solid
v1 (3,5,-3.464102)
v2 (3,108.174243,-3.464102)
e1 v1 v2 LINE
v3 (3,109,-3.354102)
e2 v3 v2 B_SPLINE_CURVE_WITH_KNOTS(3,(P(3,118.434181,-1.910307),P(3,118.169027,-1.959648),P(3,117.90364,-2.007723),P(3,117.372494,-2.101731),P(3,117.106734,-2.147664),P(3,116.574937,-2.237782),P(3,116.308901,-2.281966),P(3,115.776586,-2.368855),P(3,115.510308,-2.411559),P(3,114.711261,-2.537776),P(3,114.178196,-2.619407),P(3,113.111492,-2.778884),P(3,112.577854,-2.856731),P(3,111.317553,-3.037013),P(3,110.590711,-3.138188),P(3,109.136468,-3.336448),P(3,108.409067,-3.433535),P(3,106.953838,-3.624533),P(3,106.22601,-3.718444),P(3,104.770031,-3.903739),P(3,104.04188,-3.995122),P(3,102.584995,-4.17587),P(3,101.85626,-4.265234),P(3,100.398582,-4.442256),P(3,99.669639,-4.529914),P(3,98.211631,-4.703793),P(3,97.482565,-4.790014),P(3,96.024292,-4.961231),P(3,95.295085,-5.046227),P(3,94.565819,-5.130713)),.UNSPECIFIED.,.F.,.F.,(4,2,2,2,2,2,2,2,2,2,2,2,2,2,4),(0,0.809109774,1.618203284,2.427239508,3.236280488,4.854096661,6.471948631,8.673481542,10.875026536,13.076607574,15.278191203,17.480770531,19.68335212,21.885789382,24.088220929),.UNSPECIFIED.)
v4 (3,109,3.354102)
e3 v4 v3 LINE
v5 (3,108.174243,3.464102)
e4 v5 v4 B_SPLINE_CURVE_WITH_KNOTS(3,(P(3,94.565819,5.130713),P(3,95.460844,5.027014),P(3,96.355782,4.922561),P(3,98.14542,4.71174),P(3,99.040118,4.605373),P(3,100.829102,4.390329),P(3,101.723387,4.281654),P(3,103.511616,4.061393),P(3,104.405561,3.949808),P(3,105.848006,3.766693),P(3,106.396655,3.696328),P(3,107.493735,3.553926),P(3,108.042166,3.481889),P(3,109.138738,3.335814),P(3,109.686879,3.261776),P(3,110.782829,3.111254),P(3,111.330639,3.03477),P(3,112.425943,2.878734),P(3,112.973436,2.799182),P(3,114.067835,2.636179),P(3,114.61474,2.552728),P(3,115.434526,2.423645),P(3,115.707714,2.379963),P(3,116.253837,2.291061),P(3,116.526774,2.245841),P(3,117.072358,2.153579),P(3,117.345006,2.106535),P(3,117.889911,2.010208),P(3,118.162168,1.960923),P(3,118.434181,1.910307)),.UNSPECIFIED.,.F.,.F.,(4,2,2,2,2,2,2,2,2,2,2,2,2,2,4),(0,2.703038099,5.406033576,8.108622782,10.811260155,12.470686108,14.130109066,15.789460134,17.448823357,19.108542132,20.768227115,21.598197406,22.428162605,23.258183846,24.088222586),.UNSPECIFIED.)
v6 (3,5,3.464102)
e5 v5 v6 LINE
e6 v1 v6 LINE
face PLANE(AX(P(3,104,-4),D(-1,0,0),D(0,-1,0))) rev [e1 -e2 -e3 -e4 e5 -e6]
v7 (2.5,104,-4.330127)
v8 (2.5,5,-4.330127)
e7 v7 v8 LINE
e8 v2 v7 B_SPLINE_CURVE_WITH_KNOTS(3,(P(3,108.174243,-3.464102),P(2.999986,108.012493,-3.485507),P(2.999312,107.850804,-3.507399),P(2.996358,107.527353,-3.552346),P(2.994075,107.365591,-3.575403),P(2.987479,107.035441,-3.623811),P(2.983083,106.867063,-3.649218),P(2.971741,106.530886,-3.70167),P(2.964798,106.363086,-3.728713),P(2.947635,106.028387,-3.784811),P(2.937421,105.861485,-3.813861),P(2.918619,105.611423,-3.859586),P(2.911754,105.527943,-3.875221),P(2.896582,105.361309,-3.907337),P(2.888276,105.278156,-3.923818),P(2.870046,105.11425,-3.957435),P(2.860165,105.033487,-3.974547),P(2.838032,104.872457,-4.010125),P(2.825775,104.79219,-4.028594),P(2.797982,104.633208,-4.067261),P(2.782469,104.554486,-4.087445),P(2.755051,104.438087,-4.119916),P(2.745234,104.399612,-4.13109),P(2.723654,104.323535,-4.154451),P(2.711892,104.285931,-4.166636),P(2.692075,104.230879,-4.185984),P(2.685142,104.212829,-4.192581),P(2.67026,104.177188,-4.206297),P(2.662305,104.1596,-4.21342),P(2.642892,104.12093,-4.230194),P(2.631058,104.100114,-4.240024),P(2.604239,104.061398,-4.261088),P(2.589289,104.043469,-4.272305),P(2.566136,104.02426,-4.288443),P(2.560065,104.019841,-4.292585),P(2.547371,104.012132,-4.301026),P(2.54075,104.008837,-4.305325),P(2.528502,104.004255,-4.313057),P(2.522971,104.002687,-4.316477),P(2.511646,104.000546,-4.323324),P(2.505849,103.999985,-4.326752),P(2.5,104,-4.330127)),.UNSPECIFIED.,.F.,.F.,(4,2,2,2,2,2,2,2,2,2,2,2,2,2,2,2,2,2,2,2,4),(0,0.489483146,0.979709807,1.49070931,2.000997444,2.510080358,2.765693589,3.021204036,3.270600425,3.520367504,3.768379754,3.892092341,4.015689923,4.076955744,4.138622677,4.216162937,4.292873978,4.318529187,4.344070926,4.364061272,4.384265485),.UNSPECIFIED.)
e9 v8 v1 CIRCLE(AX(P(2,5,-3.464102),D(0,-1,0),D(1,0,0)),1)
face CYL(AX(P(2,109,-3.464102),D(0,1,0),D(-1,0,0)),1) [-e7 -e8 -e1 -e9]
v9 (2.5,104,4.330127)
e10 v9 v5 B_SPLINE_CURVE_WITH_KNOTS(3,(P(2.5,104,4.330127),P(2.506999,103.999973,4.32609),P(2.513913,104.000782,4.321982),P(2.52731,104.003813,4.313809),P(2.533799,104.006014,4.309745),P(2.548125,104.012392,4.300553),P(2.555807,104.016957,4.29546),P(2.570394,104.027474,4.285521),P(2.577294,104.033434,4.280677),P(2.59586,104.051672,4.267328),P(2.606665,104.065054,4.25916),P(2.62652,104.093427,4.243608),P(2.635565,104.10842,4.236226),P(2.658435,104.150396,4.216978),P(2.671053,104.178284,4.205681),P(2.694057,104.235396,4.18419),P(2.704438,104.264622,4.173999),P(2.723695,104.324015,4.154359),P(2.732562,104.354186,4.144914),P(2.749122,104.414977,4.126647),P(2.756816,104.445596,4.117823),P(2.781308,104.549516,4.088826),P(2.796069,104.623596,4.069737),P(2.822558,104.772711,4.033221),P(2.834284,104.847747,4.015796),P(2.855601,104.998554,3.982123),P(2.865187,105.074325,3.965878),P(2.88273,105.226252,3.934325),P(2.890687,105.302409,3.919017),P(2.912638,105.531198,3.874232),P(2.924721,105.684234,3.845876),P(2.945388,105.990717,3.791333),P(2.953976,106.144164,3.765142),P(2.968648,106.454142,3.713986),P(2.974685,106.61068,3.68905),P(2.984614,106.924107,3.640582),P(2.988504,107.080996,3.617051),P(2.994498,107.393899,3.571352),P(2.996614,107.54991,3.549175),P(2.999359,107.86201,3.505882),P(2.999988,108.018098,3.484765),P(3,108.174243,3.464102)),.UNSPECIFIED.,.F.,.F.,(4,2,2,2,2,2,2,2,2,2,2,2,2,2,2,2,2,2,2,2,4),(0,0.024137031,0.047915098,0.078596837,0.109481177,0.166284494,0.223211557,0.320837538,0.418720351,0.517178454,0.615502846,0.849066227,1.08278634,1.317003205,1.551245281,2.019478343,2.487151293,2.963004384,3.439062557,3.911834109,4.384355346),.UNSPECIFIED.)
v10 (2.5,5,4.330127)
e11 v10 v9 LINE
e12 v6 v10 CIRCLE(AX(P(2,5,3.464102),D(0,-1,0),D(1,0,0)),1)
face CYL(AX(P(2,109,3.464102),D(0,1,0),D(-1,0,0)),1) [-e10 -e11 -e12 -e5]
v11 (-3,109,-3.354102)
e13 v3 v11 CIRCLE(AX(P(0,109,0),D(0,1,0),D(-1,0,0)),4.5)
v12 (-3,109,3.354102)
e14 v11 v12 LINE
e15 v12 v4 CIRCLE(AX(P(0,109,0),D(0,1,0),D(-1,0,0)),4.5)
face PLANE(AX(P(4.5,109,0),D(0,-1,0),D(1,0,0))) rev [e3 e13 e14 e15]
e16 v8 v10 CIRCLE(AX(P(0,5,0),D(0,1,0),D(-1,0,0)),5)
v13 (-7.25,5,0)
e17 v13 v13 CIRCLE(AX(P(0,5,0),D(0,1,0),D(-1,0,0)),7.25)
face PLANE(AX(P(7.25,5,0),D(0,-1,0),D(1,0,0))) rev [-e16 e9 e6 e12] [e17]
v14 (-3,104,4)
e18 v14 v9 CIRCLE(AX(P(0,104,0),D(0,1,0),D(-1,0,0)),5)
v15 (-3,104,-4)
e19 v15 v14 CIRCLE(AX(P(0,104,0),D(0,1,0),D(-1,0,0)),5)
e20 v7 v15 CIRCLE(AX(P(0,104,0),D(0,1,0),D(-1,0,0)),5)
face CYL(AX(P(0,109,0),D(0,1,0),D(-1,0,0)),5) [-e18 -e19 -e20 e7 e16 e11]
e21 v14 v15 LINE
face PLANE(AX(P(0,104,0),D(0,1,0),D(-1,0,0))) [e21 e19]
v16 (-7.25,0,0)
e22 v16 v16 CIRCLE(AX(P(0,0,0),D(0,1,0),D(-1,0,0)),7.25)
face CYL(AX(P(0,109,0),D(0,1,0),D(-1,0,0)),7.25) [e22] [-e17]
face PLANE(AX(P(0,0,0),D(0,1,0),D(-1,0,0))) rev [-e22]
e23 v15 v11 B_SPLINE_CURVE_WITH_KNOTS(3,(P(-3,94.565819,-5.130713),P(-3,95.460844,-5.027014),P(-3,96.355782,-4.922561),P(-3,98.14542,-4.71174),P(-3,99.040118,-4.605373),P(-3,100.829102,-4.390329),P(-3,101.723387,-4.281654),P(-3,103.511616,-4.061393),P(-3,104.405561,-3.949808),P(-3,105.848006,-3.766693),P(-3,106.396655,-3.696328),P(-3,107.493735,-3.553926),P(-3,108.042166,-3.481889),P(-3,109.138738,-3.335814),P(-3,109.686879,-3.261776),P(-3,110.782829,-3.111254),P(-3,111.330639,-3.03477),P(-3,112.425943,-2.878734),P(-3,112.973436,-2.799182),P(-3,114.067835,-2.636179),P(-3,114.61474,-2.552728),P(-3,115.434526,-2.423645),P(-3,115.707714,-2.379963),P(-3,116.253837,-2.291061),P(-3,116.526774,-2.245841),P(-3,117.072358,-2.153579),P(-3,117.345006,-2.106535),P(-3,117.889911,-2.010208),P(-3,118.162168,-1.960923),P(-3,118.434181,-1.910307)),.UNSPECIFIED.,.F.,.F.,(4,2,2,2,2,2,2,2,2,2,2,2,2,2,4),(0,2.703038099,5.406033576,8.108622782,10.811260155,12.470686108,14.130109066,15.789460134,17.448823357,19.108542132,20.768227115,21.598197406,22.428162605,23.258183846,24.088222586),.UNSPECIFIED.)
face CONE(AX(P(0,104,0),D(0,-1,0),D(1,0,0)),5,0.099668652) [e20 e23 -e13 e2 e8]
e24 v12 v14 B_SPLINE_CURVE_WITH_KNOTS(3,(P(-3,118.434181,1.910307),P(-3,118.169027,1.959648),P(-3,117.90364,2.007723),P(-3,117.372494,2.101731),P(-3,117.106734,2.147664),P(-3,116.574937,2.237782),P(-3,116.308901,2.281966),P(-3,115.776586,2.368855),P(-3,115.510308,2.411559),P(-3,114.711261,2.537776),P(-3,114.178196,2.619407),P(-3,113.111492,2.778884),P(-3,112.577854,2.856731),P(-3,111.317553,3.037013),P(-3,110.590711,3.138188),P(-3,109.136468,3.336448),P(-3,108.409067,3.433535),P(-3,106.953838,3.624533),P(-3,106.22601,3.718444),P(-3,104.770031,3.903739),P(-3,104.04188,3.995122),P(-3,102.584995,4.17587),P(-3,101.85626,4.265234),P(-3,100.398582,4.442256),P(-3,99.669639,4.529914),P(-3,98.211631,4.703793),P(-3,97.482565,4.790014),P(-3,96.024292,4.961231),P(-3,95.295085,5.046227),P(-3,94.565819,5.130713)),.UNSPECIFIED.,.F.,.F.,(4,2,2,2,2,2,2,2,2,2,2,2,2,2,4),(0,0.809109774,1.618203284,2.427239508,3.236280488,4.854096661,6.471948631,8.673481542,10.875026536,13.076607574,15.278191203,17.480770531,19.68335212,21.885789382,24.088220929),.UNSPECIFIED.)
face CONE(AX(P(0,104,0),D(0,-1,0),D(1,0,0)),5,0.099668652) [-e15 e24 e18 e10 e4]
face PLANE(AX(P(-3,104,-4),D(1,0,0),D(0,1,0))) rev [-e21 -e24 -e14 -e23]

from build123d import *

# Parameters (mm, degrees)
CUT_EXTRUDE1_DEPTH = 5
CUT_EXTRUDE2_DEPTH = 99
FILLET1_R          = 1


with BuildPart() as part:
    # Sketch5 → Revolve1 (revolve)
    with BuildSketch(Plane.XY, mode=Mode.PRIVATE) as revolve1_sk:
        Polygon((0, 0), (7.25, 0), (7.25, 5), (5, 5), (5, 104), (4.5, 109), (0, 109), align=None)
    revolve(revolve1_sk.sketch.rotate(Axis((0, 109, 0), (0, -1, 0)), 180), axis=Axis((0, 109, 0), (0, -1, 0)))

    # Sketch6 → Cut-Extrude1 (cut)
    with BuildSketch(Plane(origin=(0, 109, 0), x_dir=(1, 0, 0), z_dir=(0, 1, 0))):
        with BuildLine():
            Line((3, 4), (3, -4))
            ThreePointArc((3, -4), (5, 0), (3, 4))
        make_face()
        with BuildLine():
            Line((-3, 4), (-3, -4))
            ThreePointArc((-3, -4), (-5, 0), (-3, 4))
        make_face()
    extrude(amount=-CUT_EXTRUDE1_DEPTH, mode=Mode.SUBTRACT)

    # Sketch7 → Cut-Extrude2 (cut)
    with BuildSketch(Plane(origin=(0, 104, 0), x_dir=(1, 0, 0), z_dir=(0, 1, 0))):
        with BuildLine():
            Line((3, -4), (3, 4))
            ThreePointArc((3, 4), (5, 0), (3, -4))
        make_face()
    extrude(amount=-CUT_EXTRUDE2_DEPTH, mode=Mode.SUBTRACT)

    # Fillet1
    # the kernel refuses this fillet: 1 mm, written as the material it takes off along each edge
    with BuildSketch(Plane(origin=(3, 108.493644566, 4), x_dir=(0, 0, -1), z_dir=(0, -1, 0))) as fillet1_piece_1:
        with BuildLine():
            CenterArc((0.535898385, -1), FILLET1_R, 90, 60)
            ThreePointArc((-0.330127019, -0.5), (-0.172559651, -0.245050643), (0, 0))
            Line((0, 0), (0.535898385, 0))
        make_face()
    extrude(amount=103.493644566, mode=Mode.SUBTRACT)
    with BuildSketch(Plane(origin=(3, 108.493644566, -4), x_dir=(0, 0, 1), z_dir=(0, -1, 0))) as fillet1_piece_2:
        with BuildLine():
            CenterArc((0.535898385, 1), FILLET1_R, 210, 60)
            ThreePointArc((-0.330127019, 0.5), (-0.172559651, 0.245050643), (0, 0))
            Line((0, 0), (0.535898385, 0))
        make_face()
    extrude(amount=103.493644566, mode=Mode.SUBTRACT)


solid = part.part
